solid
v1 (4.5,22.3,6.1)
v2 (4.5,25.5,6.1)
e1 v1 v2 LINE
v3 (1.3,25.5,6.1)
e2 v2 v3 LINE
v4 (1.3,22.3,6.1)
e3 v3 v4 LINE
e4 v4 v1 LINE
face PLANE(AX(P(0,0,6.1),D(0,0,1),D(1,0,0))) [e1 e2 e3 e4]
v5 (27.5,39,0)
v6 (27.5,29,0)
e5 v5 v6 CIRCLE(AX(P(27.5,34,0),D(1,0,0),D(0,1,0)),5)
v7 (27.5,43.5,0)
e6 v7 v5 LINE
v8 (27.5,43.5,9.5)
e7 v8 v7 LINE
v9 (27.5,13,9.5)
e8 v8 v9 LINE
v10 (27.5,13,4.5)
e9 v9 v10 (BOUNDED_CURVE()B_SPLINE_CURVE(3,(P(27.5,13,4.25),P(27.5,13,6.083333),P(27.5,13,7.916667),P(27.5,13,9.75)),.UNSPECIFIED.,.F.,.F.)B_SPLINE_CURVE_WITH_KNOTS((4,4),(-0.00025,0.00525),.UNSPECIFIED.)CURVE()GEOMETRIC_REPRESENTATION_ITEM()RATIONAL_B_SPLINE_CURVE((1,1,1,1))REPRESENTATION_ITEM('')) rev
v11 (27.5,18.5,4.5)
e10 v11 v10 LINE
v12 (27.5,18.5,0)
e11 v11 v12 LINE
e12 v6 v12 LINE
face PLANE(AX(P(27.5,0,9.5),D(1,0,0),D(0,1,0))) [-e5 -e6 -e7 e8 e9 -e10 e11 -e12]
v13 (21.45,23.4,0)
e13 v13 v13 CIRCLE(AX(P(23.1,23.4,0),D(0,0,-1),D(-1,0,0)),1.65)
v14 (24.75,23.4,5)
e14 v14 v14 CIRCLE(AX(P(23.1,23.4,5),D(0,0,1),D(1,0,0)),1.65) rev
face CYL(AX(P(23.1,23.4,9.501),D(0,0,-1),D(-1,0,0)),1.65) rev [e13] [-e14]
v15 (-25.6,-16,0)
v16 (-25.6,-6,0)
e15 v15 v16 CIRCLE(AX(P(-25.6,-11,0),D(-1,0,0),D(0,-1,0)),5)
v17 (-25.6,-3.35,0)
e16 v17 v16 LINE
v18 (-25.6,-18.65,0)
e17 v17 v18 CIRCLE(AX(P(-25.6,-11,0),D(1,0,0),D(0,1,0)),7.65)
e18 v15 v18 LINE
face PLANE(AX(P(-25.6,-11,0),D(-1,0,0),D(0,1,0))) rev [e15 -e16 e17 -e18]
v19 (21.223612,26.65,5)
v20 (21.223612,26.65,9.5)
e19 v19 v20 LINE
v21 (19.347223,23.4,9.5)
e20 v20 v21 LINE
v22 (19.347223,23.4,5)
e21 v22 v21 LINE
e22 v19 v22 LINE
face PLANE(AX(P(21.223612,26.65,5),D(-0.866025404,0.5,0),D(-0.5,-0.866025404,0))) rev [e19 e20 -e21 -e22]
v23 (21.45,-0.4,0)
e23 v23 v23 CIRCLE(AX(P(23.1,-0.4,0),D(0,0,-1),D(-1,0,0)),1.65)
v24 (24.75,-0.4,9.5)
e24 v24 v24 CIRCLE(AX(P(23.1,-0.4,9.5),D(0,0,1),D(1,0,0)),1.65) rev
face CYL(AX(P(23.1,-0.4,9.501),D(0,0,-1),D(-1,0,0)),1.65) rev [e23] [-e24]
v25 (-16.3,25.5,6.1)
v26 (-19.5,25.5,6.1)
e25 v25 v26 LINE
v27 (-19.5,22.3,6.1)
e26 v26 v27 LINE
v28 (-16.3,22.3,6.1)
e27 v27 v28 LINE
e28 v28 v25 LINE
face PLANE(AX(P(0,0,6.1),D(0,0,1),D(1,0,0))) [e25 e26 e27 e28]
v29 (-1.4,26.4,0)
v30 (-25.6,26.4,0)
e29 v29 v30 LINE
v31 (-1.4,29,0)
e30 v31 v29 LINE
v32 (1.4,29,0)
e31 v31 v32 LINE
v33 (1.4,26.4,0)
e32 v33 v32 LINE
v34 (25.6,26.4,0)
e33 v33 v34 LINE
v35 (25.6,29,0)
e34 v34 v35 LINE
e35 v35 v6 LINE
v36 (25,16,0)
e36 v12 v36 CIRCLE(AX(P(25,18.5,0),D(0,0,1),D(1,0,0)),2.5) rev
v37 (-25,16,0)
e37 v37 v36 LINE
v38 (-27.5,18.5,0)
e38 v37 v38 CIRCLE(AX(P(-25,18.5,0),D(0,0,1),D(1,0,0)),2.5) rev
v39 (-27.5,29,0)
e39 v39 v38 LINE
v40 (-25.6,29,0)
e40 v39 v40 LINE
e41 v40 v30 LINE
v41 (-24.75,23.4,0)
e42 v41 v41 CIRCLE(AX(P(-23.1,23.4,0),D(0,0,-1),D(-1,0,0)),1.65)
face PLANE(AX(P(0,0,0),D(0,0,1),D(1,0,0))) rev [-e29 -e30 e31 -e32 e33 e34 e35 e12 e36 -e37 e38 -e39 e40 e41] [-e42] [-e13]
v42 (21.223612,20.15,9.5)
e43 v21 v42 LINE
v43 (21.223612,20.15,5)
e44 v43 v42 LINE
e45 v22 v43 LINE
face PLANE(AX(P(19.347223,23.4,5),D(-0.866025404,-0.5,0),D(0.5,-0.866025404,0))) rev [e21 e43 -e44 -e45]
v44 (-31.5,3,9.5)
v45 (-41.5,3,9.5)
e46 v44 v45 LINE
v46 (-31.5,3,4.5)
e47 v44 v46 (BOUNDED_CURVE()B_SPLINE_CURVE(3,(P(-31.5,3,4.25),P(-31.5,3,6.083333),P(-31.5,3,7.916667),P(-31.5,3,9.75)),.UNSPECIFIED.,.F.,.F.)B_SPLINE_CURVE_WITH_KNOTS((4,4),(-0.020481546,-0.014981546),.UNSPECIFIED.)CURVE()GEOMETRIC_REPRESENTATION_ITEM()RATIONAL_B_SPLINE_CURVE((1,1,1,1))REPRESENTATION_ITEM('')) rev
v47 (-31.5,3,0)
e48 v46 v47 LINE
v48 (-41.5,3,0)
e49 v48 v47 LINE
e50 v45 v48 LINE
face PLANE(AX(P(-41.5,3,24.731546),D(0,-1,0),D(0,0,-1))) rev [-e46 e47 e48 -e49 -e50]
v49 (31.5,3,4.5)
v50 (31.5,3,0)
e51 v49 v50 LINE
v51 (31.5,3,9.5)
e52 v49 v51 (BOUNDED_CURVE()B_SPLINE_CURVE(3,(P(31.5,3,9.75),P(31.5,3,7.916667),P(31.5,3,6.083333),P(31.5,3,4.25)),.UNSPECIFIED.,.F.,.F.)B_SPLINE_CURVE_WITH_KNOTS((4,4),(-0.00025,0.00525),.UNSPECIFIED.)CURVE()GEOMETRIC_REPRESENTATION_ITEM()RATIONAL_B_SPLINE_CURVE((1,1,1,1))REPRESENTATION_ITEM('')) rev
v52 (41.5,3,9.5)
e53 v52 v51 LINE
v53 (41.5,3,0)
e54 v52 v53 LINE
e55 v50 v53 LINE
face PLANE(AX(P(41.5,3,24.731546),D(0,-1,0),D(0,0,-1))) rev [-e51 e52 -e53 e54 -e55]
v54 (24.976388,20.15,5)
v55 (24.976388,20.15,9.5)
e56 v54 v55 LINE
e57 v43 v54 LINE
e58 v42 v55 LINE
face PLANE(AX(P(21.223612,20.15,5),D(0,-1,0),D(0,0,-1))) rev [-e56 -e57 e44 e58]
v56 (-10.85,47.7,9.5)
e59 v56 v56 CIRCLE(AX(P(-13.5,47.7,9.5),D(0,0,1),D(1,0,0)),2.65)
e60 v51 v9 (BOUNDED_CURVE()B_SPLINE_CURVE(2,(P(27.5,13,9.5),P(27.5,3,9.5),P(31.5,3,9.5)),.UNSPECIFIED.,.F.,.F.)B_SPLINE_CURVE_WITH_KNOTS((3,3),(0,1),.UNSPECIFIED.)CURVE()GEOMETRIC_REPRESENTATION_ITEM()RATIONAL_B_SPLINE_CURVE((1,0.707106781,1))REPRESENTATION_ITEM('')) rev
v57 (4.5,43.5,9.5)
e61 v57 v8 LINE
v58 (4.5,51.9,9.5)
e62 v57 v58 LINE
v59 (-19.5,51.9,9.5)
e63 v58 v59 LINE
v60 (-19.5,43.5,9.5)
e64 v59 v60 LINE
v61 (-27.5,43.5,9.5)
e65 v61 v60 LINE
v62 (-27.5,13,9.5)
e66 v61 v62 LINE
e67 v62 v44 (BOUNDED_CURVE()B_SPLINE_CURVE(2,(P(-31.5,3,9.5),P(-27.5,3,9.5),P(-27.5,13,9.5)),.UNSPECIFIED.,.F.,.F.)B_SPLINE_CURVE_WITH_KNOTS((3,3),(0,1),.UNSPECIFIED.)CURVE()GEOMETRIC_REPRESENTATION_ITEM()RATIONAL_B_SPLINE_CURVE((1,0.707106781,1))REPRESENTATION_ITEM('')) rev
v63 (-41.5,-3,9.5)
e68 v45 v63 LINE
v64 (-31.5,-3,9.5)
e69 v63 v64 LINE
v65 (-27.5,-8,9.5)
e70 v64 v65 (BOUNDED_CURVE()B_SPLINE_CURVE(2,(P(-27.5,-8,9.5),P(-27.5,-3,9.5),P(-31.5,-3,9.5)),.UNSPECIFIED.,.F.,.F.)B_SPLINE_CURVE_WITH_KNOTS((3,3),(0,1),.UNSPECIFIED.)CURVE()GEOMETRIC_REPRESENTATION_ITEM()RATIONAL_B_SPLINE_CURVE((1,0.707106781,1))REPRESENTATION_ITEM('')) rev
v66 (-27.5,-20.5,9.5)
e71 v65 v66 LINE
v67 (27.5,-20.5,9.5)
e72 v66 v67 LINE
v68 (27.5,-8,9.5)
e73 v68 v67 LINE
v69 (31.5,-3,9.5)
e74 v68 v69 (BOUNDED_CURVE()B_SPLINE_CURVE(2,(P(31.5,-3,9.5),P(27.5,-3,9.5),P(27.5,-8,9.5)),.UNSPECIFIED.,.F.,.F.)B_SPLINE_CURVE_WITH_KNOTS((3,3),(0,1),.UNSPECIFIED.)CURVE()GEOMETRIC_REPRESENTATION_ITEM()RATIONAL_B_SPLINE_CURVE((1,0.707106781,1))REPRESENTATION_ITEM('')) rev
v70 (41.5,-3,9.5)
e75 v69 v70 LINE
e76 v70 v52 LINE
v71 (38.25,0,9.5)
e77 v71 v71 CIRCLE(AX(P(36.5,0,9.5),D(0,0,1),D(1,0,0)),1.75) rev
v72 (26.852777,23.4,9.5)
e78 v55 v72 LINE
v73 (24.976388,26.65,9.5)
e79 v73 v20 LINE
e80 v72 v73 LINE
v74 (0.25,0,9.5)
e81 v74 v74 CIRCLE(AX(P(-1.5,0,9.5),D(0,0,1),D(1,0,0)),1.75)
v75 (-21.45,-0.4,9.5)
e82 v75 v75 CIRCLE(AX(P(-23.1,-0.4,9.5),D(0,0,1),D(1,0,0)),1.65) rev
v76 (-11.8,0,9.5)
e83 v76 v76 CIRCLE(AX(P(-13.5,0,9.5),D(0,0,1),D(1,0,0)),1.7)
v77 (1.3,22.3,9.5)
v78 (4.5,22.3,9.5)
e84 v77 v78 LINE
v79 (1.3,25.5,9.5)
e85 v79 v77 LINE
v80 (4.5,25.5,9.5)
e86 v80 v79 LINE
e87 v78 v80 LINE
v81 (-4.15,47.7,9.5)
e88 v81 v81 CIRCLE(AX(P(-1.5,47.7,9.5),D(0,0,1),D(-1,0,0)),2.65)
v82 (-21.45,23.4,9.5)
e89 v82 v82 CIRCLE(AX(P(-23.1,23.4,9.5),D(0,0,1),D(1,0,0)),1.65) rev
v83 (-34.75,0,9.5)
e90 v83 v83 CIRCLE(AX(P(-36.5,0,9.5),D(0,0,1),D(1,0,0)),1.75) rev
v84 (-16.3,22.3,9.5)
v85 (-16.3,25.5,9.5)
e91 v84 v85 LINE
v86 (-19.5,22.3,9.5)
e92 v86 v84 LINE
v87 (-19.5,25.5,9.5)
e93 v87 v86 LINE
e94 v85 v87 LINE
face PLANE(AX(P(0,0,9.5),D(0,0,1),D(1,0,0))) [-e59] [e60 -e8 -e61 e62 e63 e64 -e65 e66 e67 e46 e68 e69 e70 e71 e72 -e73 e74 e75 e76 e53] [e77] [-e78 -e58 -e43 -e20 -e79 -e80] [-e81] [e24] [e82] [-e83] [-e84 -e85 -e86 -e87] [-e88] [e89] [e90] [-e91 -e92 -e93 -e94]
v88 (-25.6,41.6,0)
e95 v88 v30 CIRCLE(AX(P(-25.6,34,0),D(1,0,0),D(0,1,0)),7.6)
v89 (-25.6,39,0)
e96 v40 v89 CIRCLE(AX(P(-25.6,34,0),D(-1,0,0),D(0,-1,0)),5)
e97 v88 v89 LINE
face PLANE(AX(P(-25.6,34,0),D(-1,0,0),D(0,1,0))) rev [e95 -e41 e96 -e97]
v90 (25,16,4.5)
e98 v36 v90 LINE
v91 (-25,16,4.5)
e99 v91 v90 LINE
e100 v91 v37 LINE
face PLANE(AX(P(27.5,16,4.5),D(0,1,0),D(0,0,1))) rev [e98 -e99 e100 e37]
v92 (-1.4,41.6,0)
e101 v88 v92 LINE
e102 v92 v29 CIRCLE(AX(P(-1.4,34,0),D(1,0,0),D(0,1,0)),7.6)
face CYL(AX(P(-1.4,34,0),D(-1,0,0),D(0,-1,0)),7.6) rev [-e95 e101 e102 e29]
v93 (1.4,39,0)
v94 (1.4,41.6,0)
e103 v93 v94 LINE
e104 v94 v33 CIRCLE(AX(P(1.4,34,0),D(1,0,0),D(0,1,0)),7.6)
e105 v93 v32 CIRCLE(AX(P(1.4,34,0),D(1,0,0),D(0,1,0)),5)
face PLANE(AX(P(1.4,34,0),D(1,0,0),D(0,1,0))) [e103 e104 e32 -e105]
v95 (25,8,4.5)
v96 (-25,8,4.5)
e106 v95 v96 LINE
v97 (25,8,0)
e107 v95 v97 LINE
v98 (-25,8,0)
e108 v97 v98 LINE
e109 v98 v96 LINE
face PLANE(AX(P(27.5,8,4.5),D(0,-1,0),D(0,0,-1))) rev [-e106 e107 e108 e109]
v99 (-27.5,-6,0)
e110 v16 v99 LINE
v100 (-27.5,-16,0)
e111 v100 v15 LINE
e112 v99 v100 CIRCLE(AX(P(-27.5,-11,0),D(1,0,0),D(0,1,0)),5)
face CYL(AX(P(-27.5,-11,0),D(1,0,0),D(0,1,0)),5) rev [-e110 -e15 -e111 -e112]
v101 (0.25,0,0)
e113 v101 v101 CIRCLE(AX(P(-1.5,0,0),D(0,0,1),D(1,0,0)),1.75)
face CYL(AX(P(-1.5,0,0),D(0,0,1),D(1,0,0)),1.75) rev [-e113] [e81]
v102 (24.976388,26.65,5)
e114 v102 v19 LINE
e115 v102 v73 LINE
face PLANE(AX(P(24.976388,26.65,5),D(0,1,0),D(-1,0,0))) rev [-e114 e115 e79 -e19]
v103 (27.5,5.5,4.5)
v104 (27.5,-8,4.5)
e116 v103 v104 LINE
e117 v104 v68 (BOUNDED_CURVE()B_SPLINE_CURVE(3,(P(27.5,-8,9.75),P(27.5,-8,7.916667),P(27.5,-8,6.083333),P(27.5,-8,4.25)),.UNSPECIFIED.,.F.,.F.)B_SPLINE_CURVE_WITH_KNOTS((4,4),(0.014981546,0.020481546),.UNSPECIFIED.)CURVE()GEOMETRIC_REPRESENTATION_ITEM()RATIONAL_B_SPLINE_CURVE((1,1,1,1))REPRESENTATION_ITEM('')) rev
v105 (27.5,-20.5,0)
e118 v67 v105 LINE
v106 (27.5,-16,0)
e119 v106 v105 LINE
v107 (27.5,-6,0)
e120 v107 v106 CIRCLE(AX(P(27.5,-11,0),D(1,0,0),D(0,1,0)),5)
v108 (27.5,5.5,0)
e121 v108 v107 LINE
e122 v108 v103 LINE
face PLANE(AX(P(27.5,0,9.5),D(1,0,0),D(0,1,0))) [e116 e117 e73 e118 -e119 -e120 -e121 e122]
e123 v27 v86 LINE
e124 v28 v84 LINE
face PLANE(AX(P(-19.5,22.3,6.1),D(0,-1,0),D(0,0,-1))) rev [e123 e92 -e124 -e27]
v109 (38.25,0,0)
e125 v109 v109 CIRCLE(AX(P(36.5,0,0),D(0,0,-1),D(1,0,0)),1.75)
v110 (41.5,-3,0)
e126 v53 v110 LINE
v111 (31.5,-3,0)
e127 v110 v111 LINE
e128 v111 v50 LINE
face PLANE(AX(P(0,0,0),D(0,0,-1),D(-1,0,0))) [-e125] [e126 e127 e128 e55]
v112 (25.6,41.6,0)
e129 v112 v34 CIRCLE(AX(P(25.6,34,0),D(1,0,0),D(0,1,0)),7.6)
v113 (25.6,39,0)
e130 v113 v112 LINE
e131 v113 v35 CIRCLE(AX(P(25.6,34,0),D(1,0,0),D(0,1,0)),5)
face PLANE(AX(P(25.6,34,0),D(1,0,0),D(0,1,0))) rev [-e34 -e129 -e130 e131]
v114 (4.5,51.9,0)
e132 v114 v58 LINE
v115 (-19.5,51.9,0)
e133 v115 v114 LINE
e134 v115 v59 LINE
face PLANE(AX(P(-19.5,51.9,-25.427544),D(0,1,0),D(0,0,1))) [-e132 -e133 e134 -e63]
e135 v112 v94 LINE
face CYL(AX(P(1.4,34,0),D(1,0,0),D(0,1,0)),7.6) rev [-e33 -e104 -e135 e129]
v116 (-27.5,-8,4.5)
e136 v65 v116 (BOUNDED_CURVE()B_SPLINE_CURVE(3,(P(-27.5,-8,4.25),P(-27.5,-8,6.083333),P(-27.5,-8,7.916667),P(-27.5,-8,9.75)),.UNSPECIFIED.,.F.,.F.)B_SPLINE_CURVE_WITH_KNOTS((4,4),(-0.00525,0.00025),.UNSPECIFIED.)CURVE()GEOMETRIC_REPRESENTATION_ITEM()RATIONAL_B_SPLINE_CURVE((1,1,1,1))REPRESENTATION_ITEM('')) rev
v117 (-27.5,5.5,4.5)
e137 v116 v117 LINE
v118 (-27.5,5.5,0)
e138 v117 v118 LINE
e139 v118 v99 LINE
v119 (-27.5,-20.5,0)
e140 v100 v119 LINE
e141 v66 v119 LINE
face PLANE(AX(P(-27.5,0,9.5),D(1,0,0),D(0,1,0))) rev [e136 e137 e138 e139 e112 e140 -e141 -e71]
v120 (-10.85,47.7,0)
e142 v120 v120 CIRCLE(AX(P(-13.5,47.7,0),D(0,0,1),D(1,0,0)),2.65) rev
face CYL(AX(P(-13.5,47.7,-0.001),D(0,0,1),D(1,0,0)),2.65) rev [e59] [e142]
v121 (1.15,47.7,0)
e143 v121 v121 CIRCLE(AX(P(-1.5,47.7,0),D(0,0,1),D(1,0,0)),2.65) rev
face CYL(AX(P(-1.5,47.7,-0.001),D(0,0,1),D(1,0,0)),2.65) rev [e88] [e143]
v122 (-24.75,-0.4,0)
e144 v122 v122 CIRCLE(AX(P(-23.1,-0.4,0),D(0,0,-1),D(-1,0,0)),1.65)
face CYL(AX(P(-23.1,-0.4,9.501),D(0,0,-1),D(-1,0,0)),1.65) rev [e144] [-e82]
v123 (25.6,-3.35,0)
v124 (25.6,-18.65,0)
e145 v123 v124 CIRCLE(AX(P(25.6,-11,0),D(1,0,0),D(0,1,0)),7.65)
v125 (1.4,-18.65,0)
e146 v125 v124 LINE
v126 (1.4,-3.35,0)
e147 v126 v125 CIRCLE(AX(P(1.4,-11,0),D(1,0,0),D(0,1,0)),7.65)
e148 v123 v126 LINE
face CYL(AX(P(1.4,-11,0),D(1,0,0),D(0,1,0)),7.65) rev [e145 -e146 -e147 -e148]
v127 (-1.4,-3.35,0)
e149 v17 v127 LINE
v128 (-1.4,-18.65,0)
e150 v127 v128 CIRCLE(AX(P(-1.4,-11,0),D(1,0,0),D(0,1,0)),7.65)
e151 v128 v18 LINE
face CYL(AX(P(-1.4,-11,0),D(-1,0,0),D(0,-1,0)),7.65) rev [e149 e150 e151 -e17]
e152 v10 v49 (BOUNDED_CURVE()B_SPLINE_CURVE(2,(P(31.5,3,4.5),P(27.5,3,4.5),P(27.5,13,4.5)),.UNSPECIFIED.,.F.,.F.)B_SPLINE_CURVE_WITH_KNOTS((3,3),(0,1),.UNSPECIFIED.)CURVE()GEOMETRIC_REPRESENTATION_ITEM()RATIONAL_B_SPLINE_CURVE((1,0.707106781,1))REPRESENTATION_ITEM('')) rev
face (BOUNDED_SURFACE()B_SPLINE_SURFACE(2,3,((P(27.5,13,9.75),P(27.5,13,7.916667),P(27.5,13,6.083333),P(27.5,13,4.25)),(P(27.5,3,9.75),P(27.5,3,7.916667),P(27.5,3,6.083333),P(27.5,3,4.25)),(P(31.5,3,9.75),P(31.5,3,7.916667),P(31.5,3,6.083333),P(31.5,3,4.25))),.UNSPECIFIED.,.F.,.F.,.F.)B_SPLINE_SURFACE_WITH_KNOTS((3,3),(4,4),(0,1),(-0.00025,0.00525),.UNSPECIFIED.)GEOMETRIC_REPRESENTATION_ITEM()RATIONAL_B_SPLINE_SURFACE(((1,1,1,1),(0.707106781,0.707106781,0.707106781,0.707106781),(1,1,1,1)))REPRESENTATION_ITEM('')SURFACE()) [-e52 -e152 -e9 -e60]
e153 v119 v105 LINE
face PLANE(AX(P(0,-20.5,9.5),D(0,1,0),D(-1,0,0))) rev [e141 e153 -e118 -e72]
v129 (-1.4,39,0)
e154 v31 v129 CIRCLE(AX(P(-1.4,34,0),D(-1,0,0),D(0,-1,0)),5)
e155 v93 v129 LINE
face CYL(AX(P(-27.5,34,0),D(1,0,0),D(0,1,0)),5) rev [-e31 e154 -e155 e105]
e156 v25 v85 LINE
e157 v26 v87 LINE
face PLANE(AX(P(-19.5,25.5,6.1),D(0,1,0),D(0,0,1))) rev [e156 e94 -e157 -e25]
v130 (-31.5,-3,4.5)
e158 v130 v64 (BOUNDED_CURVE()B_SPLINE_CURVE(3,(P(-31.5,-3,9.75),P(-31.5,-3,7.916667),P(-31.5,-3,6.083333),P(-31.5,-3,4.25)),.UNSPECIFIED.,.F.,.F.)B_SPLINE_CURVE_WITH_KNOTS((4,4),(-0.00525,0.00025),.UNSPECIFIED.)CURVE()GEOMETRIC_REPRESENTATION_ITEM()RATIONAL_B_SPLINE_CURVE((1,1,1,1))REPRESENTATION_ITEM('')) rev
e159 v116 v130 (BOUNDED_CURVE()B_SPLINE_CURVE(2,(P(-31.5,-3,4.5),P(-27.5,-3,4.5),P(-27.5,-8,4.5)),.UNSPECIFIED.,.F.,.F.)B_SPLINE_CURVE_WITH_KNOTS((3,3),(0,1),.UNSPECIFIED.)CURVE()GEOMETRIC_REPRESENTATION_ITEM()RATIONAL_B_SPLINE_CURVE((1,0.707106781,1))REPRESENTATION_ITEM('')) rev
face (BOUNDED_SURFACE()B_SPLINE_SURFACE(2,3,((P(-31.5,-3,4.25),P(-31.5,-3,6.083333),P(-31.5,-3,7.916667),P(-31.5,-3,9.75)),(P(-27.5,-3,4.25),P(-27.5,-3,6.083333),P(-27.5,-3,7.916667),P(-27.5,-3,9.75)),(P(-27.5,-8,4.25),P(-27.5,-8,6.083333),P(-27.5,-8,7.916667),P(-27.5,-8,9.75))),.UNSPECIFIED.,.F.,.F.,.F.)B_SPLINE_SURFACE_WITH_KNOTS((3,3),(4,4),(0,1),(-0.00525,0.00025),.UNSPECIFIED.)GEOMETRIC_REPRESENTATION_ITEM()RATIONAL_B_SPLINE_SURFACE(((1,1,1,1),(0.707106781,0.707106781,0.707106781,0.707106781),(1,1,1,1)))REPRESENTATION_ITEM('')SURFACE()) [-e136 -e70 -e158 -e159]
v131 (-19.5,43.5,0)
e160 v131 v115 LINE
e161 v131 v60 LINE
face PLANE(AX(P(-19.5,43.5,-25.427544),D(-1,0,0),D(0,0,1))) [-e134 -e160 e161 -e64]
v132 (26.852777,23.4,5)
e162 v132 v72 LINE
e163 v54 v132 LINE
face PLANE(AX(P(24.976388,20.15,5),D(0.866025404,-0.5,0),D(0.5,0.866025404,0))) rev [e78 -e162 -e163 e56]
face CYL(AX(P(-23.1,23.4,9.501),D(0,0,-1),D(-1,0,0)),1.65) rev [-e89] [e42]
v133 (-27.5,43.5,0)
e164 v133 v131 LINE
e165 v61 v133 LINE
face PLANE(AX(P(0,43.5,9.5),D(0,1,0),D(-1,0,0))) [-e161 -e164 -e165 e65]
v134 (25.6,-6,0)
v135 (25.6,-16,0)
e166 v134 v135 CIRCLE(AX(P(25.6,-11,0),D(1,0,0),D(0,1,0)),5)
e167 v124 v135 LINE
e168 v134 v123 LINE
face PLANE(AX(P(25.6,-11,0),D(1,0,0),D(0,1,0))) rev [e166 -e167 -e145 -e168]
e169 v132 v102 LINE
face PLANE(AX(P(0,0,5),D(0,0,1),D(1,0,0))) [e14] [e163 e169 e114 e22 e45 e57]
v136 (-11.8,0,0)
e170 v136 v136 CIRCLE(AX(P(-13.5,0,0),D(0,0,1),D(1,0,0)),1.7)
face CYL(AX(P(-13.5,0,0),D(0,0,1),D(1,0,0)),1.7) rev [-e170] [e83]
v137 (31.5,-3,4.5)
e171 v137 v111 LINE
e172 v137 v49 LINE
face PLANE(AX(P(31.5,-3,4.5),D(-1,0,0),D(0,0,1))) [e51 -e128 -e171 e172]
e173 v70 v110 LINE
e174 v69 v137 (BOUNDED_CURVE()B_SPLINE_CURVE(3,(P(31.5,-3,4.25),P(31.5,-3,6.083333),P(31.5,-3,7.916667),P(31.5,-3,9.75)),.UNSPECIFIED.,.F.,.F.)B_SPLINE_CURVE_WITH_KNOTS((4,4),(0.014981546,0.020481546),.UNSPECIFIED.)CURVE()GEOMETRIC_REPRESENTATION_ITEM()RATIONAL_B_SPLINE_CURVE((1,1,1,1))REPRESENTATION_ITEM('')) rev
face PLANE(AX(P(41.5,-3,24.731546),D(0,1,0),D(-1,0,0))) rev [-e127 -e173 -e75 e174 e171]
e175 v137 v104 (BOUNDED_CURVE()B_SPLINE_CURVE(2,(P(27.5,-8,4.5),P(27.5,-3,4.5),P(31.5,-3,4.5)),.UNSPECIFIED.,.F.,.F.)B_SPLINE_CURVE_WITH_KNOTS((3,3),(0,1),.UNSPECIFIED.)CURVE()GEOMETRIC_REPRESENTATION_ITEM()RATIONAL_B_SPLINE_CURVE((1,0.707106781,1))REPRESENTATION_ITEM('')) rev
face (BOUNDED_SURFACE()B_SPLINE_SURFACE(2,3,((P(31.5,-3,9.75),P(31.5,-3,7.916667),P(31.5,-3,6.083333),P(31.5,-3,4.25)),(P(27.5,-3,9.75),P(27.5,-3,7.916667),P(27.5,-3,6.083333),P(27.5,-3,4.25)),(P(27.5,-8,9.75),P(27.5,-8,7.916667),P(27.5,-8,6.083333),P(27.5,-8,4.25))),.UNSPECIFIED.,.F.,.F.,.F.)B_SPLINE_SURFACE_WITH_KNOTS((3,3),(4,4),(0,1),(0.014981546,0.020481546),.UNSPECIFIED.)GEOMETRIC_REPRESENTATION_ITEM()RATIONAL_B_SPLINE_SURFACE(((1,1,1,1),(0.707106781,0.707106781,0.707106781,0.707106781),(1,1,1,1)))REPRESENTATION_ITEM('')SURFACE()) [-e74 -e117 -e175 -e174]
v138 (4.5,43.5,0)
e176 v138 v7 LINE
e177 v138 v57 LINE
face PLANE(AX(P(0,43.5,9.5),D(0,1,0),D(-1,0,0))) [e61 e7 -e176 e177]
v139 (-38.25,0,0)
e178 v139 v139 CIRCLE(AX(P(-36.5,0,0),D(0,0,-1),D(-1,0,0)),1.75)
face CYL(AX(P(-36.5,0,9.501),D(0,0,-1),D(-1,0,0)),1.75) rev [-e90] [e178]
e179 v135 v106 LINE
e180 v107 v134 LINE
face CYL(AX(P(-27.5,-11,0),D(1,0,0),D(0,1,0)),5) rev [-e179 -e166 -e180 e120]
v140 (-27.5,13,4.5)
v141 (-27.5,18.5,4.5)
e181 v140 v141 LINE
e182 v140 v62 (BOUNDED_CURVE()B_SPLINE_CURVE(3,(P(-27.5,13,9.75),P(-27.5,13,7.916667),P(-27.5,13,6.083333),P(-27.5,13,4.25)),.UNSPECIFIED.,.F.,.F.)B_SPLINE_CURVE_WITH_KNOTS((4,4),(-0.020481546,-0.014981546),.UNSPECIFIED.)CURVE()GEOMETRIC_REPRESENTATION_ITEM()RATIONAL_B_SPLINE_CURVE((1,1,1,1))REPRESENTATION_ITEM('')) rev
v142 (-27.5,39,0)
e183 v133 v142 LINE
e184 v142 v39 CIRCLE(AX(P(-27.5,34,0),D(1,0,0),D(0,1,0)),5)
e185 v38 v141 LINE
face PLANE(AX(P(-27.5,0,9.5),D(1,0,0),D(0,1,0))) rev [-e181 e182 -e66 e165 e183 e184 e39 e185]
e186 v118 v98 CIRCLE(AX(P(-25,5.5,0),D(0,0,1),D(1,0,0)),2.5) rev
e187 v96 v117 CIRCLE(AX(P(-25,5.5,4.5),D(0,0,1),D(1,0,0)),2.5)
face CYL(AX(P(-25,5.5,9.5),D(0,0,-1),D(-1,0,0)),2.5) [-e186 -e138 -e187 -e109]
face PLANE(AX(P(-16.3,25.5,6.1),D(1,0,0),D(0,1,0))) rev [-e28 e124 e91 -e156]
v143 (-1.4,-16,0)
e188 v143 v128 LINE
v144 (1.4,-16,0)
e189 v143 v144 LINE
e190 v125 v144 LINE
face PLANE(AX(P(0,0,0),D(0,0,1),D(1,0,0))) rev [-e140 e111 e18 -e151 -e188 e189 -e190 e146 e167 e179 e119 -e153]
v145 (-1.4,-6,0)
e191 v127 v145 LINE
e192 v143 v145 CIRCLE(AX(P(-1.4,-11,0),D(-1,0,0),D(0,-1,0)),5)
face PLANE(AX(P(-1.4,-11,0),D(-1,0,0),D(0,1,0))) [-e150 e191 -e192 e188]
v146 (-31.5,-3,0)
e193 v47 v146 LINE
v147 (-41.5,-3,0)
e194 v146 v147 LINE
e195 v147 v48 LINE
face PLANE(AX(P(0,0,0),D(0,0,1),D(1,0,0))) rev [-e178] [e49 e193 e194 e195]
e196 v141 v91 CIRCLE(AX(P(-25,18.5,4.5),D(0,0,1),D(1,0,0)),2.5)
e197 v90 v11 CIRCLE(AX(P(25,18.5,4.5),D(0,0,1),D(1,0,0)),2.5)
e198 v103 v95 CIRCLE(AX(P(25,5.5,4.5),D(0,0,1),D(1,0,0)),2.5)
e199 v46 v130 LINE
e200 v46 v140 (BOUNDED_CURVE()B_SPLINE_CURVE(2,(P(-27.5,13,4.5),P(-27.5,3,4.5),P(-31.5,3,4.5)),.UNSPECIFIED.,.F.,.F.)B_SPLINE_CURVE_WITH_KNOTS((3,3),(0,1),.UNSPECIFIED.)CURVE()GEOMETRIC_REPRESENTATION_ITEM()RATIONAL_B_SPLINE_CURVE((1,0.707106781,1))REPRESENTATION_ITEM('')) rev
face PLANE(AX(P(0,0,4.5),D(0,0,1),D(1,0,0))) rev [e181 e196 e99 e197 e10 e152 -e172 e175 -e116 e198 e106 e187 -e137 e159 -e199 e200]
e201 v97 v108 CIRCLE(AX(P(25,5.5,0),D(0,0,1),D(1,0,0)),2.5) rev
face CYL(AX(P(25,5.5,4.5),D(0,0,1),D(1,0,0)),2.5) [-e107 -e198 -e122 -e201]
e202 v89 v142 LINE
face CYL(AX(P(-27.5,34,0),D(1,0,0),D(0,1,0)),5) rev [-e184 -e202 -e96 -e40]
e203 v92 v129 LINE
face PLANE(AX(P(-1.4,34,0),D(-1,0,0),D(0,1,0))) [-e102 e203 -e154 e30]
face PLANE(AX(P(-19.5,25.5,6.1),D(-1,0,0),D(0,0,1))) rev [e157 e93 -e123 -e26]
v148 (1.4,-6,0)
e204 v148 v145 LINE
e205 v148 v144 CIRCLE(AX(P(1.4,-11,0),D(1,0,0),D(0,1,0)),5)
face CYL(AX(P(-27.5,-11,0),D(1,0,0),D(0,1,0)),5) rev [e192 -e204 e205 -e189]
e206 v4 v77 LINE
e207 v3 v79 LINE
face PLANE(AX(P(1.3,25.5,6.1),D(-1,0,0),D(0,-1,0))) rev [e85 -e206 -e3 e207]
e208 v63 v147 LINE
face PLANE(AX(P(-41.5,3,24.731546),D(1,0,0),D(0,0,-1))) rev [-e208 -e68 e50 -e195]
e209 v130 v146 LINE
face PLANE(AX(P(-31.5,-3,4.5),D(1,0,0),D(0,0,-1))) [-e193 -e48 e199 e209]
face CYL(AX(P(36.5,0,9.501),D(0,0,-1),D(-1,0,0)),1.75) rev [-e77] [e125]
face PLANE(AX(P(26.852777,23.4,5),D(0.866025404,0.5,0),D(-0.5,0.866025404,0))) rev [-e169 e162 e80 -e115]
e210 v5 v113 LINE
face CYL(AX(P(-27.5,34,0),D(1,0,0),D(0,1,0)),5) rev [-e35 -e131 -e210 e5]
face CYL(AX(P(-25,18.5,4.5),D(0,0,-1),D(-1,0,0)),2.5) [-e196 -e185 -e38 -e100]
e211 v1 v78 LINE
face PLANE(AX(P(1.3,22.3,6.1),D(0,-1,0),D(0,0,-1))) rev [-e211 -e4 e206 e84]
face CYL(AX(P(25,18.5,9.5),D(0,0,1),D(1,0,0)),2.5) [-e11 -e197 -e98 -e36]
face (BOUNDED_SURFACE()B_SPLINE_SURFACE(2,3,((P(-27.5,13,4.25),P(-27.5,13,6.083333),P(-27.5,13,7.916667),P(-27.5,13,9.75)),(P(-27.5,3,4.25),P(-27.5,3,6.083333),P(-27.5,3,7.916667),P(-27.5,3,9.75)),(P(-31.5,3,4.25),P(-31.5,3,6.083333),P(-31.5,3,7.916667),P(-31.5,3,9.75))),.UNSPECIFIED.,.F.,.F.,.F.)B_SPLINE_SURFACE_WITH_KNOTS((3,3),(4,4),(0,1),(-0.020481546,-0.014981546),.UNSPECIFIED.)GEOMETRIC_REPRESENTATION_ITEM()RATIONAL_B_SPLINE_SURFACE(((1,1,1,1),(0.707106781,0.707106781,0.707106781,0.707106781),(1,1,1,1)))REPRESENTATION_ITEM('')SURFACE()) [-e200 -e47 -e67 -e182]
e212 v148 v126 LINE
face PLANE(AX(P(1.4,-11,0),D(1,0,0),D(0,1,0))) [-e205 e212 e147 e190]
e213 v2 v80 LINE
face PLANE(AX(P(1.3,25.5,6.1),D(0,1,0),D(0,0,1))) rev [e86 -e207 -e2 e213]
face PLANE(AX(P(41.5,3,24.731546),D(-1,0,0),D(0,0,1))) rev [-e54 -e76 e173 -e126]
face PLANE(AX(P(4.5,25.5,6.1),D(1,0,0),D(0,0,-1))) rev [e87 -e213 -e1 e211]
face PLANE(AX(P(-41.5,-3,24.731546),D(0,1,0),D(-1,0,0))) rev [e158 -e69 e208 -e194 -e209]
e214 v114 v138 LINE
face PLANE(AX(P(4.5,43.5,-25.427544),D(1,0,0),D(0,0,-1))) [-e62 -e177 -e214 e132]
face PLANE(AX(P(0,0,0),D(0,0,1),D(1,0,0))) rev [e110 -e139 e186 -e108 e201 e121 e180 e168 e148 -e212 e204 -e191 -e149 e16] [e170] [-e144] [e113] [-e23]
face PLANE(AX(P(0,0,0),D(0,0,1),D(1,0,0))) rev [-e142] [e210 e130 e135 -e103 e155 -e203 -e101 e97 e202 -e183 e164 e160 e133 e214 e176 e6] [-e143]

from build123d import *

# Parameters (mm, degrees)
SZKIC8_W                        = 55
SZKIC8_H                        = 64
DODANIE_WYCI_GNI_CIE3_DEPTH     = 9.5
WYTNIJ_WYCI_GNI_CIE2_START      = -1.9
SZKIC9_R                        = 7.6
WYTNIJ_WYCI_GNI_CIE2_DEPTH      = 24.2
WYTNIJ_WYCI_GNI_CIE3_START      = -1.9
SZKIC10_R                       = 7.65
WYTNIJ_WYCI_GNI_CIE3_DEPTH      = 24.2
WYTNIJ_WYCI_GNI_CIE4_DEPTH      = 71.763691255
WYTNIJ_WYCI_GNI_CIE4_DEPTH_BACK = 71.763691255
SZKIC11_R                       = 5
WYTNIJ_WYCI_GNI_CIE25_REACH     = 54.333
SZKIC42_R                       = 1.65
SZKIC43_W                       = 24
SZKIC43_H                       = 8.4
DODANIE_WYCI_GNI_CIE4_DEPTH     = 9.5
WYTNIJ_WYCI_GNI_CIE26_REACH     = 61.499
SZKIC44_R                       = 2.65
SZKIC45_W                       = 3.2
SZKIC45_H                       = 3.2
WYTNIJ_WYCI_GNI_CIE27_DEPTH     = 3.4
SZKIC46_R                       = 1.7
SZKIC46_R_2                     = 1.75
WYTNIJ_WYCI_GNI_CIE28_DEPTH     = 60.498823518
WYTNIJ_WYCI_GNI_CIE29_DEPTH     = 4.5
SZKIC49_W                       = 10
SZKIC49_H                       = 6
DODANIE_WYCI_GNI_CIE5_DEPTH     = 4.5
DODANIE_WYCI_GNI_CIE5_2_DEPTH   = 4.5
SZKIC50_W                       = 14
SZKIC50_H                       = 6
DODANIE_WYCI_GNI_CIE6_DEPTH     = 5
WYTNIJ_WYCI_GNI_CIE31_REACH     = 69.128
SZKIC51_R                       = 1.75
ZAOKR_GLENIE2_SIZE              = 10
ZAOKR_GLENIE2_SIZE_2            = 4
ZAOKR_GLENIE3_SIZE              = 4
ZAOKR_GLENIE3_SIZE_2            = 5
SZKIC52_W                       = 55
SZKIC52_H                       = 8
WYTNIJ_WYCI_GNI_CIE32_DEPTH     = 4.5
ZAOKR_GLENIE4_R                 = 2.5


with BuildPart() as part:
    # Szkic8 → Dodanie-wyciągnięcie3 (new body)
    with BuildSketch(Plane.XY):
        with Locations((0, 11.5)):
            Rectangle(SZKIC8_W, SZKIC8_H)
    extrude(amount=DODANIE_WYCI_GNI_CIE3_DEPTH)

    # Szkic9 → Wytnij-wyciągnięcie2 (cut)
    with BuildSketch(Plane(origin=(27.5, 0, 0), x_dir=(0, 0, -1), z_dir=(1, 0, 0)).offset(WYTNIJ_WYCI_GNI_CIE2_START)):
        with Locations((0, 34)):
            Circle(SZKIC9_R)
    wytnij_wyci_gni_cie2 = extrude(amount=-WYTNIJ_WYCI_GNI_CIE2_DEPTH, mode=Mode.SUBTRACT)

    # Szkic10 → Wytnij-wyciągnięcie3 (cut)
    with BuildSketch(Plane(origin=(27.5, 0, 0), x_dir=(0, 0, -1), z_dir=(1, 0, 0)).offset(WYTNIJ_WYCI_GNI_CIE3_START)):
        with Locations((0, -11)):
            Circle(SZKIC10_R)
    wytnij_wyci_gni_cie3 = extrude(amount=-WYTNIJ_WYCI_GNI_CIE3_DEPTH, mode=Mode.SUBTRACT)

    # Lustro4: Wytnij-wyciągnięcie2, Wytnij-wyciągnięcie3 across plane
    add(wytnij_wyci_gni_cie2.mirror(Plane(origin=(0, 0, 0), x_dir=(0, 0, 1), z_dir=(1, 0, 0))), mode=Mode.SUBTRACT)
    add(wytnij_wyci_gni_cie3.mirror(Plane(origin=(0, 0, 0), x_dir=(0, 0, 1), z_dir=(1, 0, 0))), mode=Mode.SUBTRACT)

    # Szkic11 → Wytnij-wyciągnięcie4 (cut, two sides: drawn at the far end of the back side and taken through both)
    with BuildSketch(Plane(origin=(27.5, 0, 0), x_dir=(0, 0, -1), z_dir=(1, 0, 0)).offset(-WYTNIJ_WYCI_GNI_CIE4_DEPTH_BACK)):
        with Locations((0, 34)):
            Circle(SZKIC11_R)
        with Locations((0, -11)):
            Circle(SZKIC11_R)
    extrude(amount=WYTNIJ_WYCI_GNI_CIE4_DEPTH + WYTNIJ_WYCI_GNI_CIE4_DEPTH_BACK, mode=Mode.SUBTRACT)

    # Szkic42 → Wytnij-wyciągnięcie25 (cut, up to next)
    with BuildSketch(Plane(origin=(0, 0, 0), x_dir=(-1, 0, 0), z_dir=(0, 0, -1)), mode=Mode.PRIVATE) as wytnij_wyci_gni_cie25_sk1:
        with Locations((23.1, 23.4)):
            Circle(SZKIC42_R)
    wytnij_wyci_gni_cie25_tool1 = extrude(wytnij_wyci_gni_cie25_sk1.sketch, amount=-WYTNIJ_WYCI_GNI_CIE25_REACH, mode=Mode.PRIVATE) & part.part
    # Szkic42 → Wytnij-wyciągnięcie25 (cut, up to next)
    with BuildSketch(Plane(origin=(0, 0, 0), x_dir=(-1, 0, 0), z_dir=(0, 0, -1)), mode=Mode.PRIVATE) as wytnij_wyci_gni_cie25_sk2:
        with Locations((23.1, -0.4)):
            Circle(SZKIC42_R)
    wytnij_wyci_gni_cie25_tool2 = extrude(wytnij_wyci_gni_cie25_sk2.sketch, amount=-WYTNIJ_WYCI_GNI_CIE25_REACH, mode=Mode.PRIVATE) & part.part
    # Szkic42 → Wytnij-wyciągnięcie25 (cut, up to next)
    with BuildSketch(Plane(origin=(0, 0, 0), x_dir=(-1, 0, 0), z_dir=(0, 0, -1)), mode=Mode.PRIVATE) as wytnij_wyci_gni_cie25_sk3:
        with Locations((-23.1, -0.4)):
            Circle(SZKIC42_R)
    wytnij_wyci_gni_cie25_tool3 = extrude(wytnij_wyci_gni_cie25_sk3.sketch, amount=-WYTNIJ_WYCI_GNI_CIE25_REACH, mode=Mode.PRIVATE) & part.part
    # Szkic42 → Wytnij-wyciągnięcie25 (cut, up to next)
    with BuildSketch(Plane(origin=(0, 0, 0), x_dir=(-1, 0, 0), z_dir=(0, 0, -1)), mode=Mode.PRIVATE) as wytnij_wyci_gni_cie25_sk4:
        with Locations((-23.1, 23.4)):
            Circle(SZKIC42_R)
    wytnij_wyci_gni_cie25_tool4 = extrude(wytnij_wyci_gni_cie25_sk4.sketch, amount=-WYTNIJ_WYCI_GNI_CIE25_REACH, mode=Mode.PRIVATE) & part.part
    add(wytnij_wyci_gni_cie25_tool1.solids().sort_by_distance((-23.1, 23.4, 0))[0], mode=Mode.SUBTRACT)
    add(wytnij_wyci_gni_cie25_tool2.solids().sort_by_distance((-23.1, -0.4, 0))[0], mode=Mode.SUBTRACT)
    add(wytnij_wyci_gni_cie25_tool3.solids().sort_by_distance((23.1, -0.4, 0))[0], mode=Mode.SUBTRACT)
    add(wytnij_wyci_gni_cie25_tool4.solids().sort_by_distance((23.1, 23.4, 0))[0], mode=Mode.SUBTRACT)

    # Szkic43 → Dodanie-wyciągnięcie4 (add)
    with BuildSketch(Plane.XY.offset(9.5)):
        with Locations((-7.5, 47.7)):
            Rectangle(SZKIC43_W, SZKIC43_H)
    extrude(amount=-DODANIE_WYCI_GNI_CIE4_DEPTH)

    # Szkic44 → Wytnij-wyciągnięcie26 (cut, up to next)
    with BuildSketch(Plane.XY.offset(9.5), mode=Mode.PRIVATE) as wytnij_wyci_gni_cie26_sk1:
        with Locations((-13.5, 47.7)):
            Circle(SZKIC44_R)
    wytnij_wyci_gni_cie26_tool1 = extrude(wytnij_wyci_gni_cie26_sk1.sketch, amount=-WYTNIJ_WYCI_GNI_CIE26_REACH, mode=Mode.PRIVATE) & part.part
    # Szkic44 → Wytnij-wyciągnięcie26 (cut, up to next)
    with BuildSketch(Plane.XY.offset(9.5), mode=Mode.PRIVATE) as wytnij_wyci_gni_cie26_sk2:
        with Locations((-1.5, 47.7)):
            Circle(SZKIC44_R)
    wytnij_wyci_gni_cie26_tool2 = extrude(wytnij_wyci_gni_cie26_sk2.sketch, amount=-WYTNIJ_WYCI_GNI_CIE26_REACH, mode=Mode.PRIVATE) & part.part
    add(wytnij_wyci_gni_cie26_tool1.solids().sort_by_distance((-13.5, 47.7, 9.5))[0], mode=Mode.SUBTRACT)
    add(wytnij_wyci_gni_cie26_tool2.solids().sort_by_distance((-1.5, 47.7, 9.5))[0], mode=Mode.SUBTRACT)

    # Szkic45 → Wytnij-wyciągnięcie27 (cut)
    with BuildSketch(Plane.XY.offset(9.5)):
        with Locations((-17.9, 23.9)):
            Rectangle(SZKIC45_W, SZKIC45_H)
        with Locations((2.9, 23.9)):
            Rectangle(SZKIC45_W, SZKIC45_H)
    extrude(amount=-WYTNIJ_WYCI_GNI_CIE27_DEPTH, mode=Mode.SUBTRACT)

    # Szkic46 → Wytnij-wyciągnięcie28 (cut, through all)
    with BuildSketch(Plane.XY.offset(9.5)):
        with Locations((-13.5, 0)):
            Circle(SZKIC46_R)
        with Locations((-1.5, 0)):
            Circle(SZKIC46_R_2)
    extrude(amount=-WYTNIJ_WYCI_GNI_CIE28_DEPTH, mode=Mode.SUBTRACT)

    # Szkic47 → Wytnij-wyciągnięcie29 (cut)
    with BuildSketch(Plane.XY.offset(9.5)):
        Polygon((21.223611625, 20.15), (24.976388375, 20.15), (26.85277675, 23.4), (24.976388375, 26.65), (21.223611625, 26.65), (19.34722325, 23.4), align=None)
    extrude(amount=-WYTNIJ_WYCI_GNI_CIE29_DEPTH, mode=Mode.SUBTRACT)



with BuildPart() as body_2:
    # Szkic49 → Dodanie-wyciągnięcie5 (new body)
    with BuildSketch(Plane(origin=(0, 0, 0), x_dir=(-1, 0, 0), z_dir=(0, 0, -1))):
        with Locations((36.5, 0)):
            Rectangle(SZKIC49_W, SZKIC49_H)
    extrude(amount=-DODANIE_WYCI_GNI_CIE5_DEPTH)


with BuildPart() as body_3:
    # Szkic49 → Dodanie-wyci_gni_cie5 2 (new body)
    with BuildSketch(Plane(origin=(0, 0, 0), x_dir=(-1, 0, 0), z_dir=(0, 0, -1))):
        with Locations((-36.5, 0)):
            Rectangle(SZKIC49_W, SZKIC49_H)
    extrude(amount=-DODANIE_WYCI_GNI_CIE5_2_DEPTH)


with BuildPart() as part_1:
    add(part.part)

    add(body_2.part)  # Dodanie-wyciągnięcie6 merges body 2

    add(body_3.part)  # Dodanie-wyciągnięcie6 merges body 3
    # Szkic50 → Dodanie-wyciągnięcie6 (add)
    with BuildSketch(Plane.XY.offset(4.5)):
        with Locations((-34.5, 0)):
            Rectangle(SZKIC50_W, SZKIC50_H)
        with Locations((34.5, 0)):
            Rectangle(SZKIC50_W, SZKIC50_H)
    extrude(amount=DODANIE_WYCI_GNI_CIE6_DEPTH)

    # Szkic51 → Wytnij-wyciągnięcie31 (cut, up to next)
    with BuildSketch(Plane(origin=(0, 0, 0), x_dir=(-1, 0, 0), z_dir=(0, 0, -1)), mode=Mode.PRIVATE) as wytnij_wyci_gni_cie31_sk1:
        with Locations((36.5, 0)):
            Circle(SZKIC51_R)
    wytnij_wyci_gni_cie31_tool1 = extrude(wytnij_wyci_gni_cie31_sk1.sketch, amount=-WYTNIJ_WYCI_GNI_CIE31_REACH, mode=Mode.PRIVATE) & part_1.part
    # Szkic51 → Wytnij-wyciągnięcie31 (cut, up to next)
    with BuildSketch(Plane(origin=(0, 0, 0), x_dir=(-1, 0, 0), z_dir=(0, 0, -1)), mode=Mode.PRIVATE) as wytnij_wyci_gni_cie31_sk2:
        with Locations(Location((-36.5, 0, 0), (0, 0, 180))):
            Circle(SZKIC51_R)
    wytnij_wyci_gni_cie31_tool2 = extrude(wytnij_wyci_gni_cie31_sk2.sketch, amount=-WYTNIJ_WYCI_GNI_CIE31_REACH, mode=Mode.PRIVATE) & part_1.part
    add(wytnij_wyci_gni_cie31_tool1.solids().sort_by_distance((-36.5, 0, 0))[0], mode=Mode.SUBTRACT)
    add(wytnij_wyci_gni_cie31_tool2.solids().sort_by_distance((36.5, 0, 0))[0], mode=Mode.SUBTRACT)

    # Zaokrąglenie2
    # an asymmetric fillet: 10, 4 mm, written as the material it adds along each edge
    with BuildSketch(Plane(origin=(-27.5, 3, 4.5), x_dir=(0, 1, 0), z_dir=(0, 0, 1))) as zaokr_glenie2_piece_1:
        with BuildLine():
            Bezier((ZAOKR_GLENIE2_SIZE, 0), (0, 0), (0, ZAOKR_GLENIE2_SIZE_2), weights=[1, 0.707106781, 1])
            Line((0, ZAOKR_GLENIE2_SIZE_2), (0, 0))
            Line((0, 0), (ZAOKR_GLENIE2_SIZE, 0))
        make_face()
    extrude(amount=5)
    with BuildSketch(Plane(origin=(27.5, 3, 4.5), x_dir=(0, 1, 0), z_dir=(0, 0, 1))) as zaokr_glenie2_piece_2:
        with BuildLine():
            Bezier((ZAOKR_GLENIE2_SIZE, 0), (0, 0), (0, -ZAOKR_GLENIE2_SIZE_2), weights=[1, 0.707106781, 1])
            Line((0, -ZAOKR_GLENIE2_SIZE_2), (0, 0))
            Line((0, 0), (ZAOKR_GLENIE2_SIZE, 0))
        make_face()
    extrude(amount=5)

    # Zaokrąglenie3
    # an asymmetric fillet: 5, 4 mm, written as the material it adds along each edge
    with BuildSketch(Plane(origin=(-27.5, -3, 4.5), x_dir=(-1, 0, 0), z_dir=(0, 0, 1))) as zaokr_glenie3_piece_1:
        with BuildLine():
            Bezier((ZAOKR_GLENIE3_SIZE, 0), (0, 0), (0, ZAOKR_GLENIE3_SIZE_2), weights=[1, 0.707106781, 1])
            Line((0, ZAOKR_GLENIE3_SIZE_2), (0, 0))
            Line((0, 0), (ZAOKR_GLENIE3_SIZE, 0))
        make_face()
    extrude(amount=5)
    with BuildSketch(Plane(origin=(27.5, -3, 4.5), x_dir=(1, 0, 0), z_dir=(0, 0, 1))) as zaokr_glenie3_piece_2:
        with BuildLine():
            Bezier((ZAOKR_GLENIE3_SIZE, 0), (0, 0), (0, -ZAOKR_GLENIE3_SIZE_2), weights=[1, 0.707106781, 1])
            Line((0, -ZAOKR_GLENIE3_SIZE_2), (0, 0))
            Line((0, 0), (ZAOKR_GLENIE3_SIZE, 0))
        make_face()
    extrude(amount=5)

    # Szkic52 → Wytnij-wyciągnięcie32 (cut)
    with BuildSketch(Plane(origin=(0, 0, 0), x_dir=(-1, 0, 0), z_dir=(0, 0, -1))):
        with Locations((0, 12)):
            Rectangle(SZKIC52_W, SZKIC52_H)
    extrude(amount=-WYTNIJ_WYCI_GNI_CIE32_DEPTH, mode=Mode.SUBTRACT)

    # Zaokrąglenie4
    zaokr_glenie4_edges = [part_1.edges().sort_by_distance(p)[0] for p in [
        (27.5, 8, 2.25),
        (27.5, 16, 2.25),
        (-27.5, 8, 2.25),
        (-27.5, 16, 2.25),
    ]]
    fillet(zaokr_glenie4_edges, radius=ZAOKR_GLENIE4_R)


solid = part_1.part
